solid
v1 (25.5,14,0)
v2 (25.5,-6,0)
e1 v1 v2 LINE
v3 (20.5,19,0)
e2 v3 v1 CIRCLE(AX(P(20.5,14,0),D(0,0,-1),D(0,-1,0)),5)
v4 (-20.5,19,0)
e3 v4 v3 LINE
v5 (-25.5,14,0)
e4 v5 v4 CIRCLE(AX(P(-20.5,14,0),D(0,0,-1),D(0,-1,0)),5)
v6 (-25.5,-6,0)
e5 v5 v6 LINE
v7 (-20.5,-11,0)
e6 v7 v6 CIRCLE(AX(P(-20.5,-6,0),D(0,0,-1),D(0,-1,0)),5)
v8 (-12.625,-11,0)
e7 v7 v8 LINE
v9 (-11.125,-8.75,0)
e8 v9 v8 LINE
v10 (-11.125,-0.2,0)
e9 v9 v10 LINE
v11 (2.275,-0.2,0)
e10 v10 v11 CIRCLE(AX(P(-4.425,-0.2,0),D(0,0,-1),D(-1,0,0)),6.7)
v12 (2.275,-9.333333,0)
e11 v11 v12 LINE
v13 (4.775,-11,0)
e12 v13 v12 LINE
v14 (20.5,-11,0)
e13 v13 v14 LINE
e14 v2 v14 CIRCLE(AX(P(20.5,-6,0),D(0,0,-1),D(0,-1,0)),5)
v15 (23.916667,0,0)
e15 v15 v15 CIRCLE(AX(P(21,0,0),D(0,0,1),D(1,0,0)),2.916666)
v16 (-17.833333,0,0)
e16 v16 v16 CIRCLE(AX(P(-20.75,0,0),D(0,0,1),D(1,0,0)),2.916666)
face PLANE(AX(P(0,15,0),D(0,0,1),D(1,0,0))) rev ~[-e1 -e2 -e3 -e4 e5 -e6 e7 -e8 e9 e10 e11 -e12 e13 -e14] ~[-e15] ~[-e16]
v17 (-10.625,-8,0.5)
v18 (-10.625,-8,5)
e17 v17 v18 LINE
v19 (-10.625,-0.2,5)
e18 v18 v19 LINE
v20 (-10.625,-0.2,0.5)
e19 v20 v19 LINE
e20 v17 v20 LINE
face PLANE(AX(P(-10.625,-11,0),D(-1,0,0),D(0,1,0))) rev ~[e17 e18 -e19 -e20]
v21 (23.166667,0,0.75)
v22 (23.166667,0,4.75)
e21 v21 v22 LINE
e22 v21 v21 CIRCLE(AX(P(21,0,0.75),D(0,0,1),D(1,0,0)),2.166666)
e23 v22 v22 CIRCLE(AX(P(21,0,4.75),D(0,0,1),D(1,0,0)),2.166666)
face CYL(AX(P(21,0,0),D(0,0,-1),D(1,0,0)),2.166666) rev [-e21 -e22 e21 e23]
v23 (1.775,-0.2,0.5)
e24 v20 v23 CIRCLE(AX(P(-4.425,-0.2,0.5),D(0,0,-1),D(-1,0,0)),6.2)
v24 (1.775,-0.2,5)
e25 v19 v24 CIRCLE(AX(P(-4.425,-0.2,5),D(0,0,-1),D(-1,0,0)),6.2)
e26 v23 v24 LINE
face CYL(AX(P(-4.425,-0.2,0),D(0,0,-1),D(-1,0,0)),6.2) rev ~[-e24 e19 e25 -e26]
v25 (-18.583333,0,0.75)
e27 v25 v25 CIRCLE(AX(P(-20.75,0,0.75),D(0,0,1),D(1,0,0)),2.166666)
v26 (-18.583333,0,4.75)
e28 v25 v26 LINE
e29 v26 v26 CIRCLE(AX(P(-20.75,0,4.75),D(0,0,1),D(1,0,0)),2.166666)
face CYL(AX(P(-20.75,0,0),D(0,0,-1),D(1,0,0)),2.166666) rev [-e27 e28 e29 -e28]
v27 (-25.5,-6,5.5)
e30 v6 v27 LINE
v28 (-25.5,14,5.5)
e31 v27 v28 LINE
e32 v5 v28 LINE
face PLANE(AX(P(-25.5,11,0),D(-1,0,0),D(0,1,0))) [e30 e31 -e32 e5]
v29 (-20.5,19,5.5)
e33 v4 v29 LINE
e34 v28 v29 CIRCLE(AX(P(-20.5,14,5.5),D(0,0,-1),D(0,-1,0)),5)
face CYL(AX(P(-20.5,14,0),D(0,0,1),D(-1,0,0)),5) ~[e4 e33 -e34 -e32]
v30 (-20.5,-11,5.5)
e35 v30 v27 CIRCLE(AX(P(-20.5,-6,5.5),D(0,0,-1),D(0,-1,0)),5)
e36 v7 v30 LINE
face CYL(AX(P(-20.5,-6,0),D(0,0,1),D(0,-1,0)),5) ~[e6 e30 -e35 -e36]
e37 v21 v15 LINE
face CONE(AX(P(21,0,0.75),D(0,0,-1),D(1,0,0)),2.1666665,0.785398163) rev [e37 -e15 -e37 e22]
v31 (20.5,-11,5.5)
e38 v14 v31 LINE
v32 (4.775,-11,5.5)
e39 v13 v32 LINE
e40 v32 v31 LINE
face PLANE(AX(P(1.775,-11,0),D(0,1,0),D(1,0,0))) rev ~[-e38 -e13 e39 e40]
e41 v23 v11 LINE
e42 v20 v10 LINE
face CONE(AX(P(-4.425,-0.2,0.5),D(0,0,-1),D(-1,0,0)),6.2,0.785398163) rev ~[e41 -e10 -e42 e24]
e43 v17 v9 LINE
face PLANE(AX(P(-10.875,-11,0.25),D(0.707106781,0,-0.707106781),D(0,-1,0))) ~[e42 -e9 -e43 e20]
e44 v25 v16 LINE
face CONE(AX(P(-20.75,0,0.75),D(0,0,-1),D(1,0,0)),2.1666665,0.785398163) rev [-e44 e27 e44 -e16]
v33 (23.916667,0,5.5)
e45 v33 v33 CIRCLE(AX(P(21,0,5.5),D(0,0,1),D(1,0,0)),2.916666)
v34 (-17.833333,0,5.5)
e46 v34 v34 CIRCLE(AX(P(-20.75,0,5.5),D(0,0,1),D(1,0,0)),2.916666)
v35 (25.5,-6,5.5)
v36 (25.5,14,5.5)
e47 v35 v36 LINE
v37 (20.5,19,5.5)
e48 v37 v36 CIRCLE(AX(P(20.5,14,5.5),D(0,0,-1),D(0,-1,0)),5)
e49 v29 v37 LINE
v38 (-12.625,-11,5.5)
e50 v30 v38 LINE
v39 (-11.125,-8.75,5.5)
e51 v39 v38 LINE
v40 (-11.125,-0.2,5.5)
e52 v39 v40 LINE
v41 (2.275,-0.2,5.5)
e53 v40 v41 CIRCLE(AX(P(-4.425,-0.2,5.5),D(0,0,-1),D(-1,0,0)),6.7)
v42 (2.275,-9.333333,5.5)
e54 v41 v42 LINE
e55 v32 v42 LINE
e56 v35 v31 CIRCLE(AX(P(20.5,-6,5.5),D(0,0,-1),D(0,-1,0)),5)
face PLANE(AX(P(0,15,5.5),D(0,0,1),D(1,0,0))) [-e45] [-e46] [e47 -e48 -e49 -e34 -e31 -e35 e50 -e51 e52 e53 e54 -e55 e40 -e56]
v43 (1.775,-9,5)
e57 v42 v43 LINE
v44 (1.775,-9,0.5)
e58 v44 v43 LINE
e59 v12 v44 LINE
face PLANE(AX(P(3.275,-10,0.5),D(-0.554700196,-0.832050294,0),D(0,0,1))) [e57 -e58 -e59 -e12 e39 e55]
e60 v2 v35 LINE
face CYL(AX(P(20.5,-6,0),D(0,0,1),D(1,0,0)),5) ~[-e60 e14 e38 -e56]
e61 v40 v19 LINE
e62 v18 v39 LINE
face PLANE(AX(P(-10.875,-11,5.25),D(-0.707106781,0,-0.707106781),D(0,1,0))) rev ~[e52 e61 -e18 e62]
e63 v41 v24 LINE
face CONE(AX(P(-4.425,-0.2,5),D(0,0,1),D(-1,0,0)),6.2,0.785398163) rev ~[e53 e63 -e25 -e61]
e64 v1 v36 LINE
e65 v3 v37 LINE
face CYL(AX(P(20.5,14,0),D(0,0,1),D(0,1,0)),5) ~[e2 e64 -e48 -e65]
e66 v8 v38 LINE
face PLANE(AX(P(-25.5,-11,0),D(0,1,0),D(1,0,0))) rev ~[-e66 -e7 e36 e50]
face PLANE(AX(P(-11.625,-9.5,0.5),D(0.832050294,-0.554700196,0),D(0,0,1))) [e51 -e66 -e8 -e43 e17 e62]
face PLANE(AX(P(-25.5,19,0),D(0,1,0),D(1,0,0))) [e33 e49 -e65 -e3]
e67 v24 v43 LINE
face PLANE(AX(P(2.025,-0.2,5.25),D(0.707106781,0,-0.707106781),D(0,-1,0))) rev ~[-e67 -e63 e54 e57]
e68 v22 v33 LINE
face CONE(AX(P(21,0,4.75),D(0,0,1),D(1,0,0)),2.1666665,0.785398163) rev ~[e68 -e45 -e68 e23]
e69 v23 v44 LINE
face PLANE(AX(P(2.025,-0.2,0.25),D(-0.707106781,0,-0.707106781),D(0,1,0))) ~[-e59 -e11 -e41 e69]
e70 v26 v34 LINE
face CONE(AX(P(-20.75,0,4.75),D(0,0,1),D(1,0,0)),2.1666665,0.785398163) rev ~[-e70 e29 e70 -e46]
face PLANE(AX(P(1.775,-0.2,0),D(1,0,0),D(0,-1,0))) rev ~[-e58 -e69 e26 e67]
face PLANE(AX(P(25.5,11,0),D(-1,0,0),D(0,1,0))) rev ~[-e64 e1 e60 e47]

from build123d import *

# Parameters (mm, degrees)
F0_R       = 2.1666665
F1_DEPTH   = 5.5
F2_SIZE    = 0.75
F3_W       = 51
F3_H       = 8
F4_DEPTH   = 5.5
F5_SIZE    = 0.5
F7_R       = 5
F8_SIZE2   = 2
F8_SIZE    = 3
F8_2_SIZE2 = 2
F8_2_SIZE  = 3


with BuildPart() as f1:
    # F0 (on Top) → F1 (new body)
    with BuildSketch(Plane.XY):
        with BuildLine():
            Line((25.5, 11), (-25.5, 11))
            Line((-25.5, 11), (-25.5, -11))
            Line((-25.5, -11), (-10.625, -11))
            Line((-10.625, -11), (-10.625, -0.2))
            ThreePointArc((-10.625, -0.2), (-4.425, 6), (1.775, -0.2))
            Line((1.775, -0.2), (1.775, -11))
            Line((1.775, -11), (25.5, -11))
            Line((25.5, -11), (25.5, 11))
        make_face()
        with Locations((-20.75, 0)):
            Circle(F0_R, mode=Mode.SUBTRACT)
        with Locations((21, 0)):
            Circle(F0_R, mode=Mode.SUBTRACT)
    extrude(amount=F1_DEPTH)

    # F2
    f2_edges = [f1.edges().sort_by_distance(p)[0] for p in [
        (-22.916666, 0, 0),
        (18.833334, 0, 0),
        (18.833334, 0, 5.5),
        (-22.916666, 0, 5.5),
    ]]
    chamfer(f2_edges, length=F2_SIZE)

    # F3 (on Top) → F4 (join, through all)
    with BuildSketch(Plane.XY):
        with Locations((0, 15)):
            Rectangle(F3_W, F3_H)
    extrude(amount=F4_DEPTH)

    # F5
    f5_edges = [f1.edges().sort_by_distance(p)[0] for p in [
        (-4.425, 6, 5.5),
        (-4.425, 6, 0),
        (-10.625, -5.6, 5.5),
        (-10.625, -5.6, 0),
        (1.775, -5.6, 0),
        (1.775, -5.6, 5.5),
    ]]
    chamfer(f5_edges, length=F5_SIZE)

    # F7
    f7_edges = [f1.edges().sort_by_distance(p)[0] for p in [
        (25.5, -11, 2.75),
        (-25.5, -11, 2.75),
        (25.5, 19, 2.75),
        (-25.5, 19, 2.75),
    ]]
    fillet(f7_edges, radius=F7_R)

    # F8
    f8_edges = [f1.edges().sort_by_distance(p)[0] for p in [
        (-10.625, -11, 2.75),
    ]]
    f8_side = f1.faces().sort_by_distance((-10.625, -5.6, 2.75))[0]
    chamfer(f8_edges, length=F8_SIZE, length2=F8_SIZE2, reference=f8_side)

    # F8#2
    f8_2_edges = [f1.edges().sort_by_distance(p)[0] for p in [
        (1.775, -11, 2.75),
    ]]
    f8_2_side = f1.faces().sort_by_distance((11.159877, -11, 2.75))[0]
    chamfer(f8_2_edges, length=F8_2_SIZE, length2=F8_2_SIZE2, reference=f8_2_side)


solid = f1.part
